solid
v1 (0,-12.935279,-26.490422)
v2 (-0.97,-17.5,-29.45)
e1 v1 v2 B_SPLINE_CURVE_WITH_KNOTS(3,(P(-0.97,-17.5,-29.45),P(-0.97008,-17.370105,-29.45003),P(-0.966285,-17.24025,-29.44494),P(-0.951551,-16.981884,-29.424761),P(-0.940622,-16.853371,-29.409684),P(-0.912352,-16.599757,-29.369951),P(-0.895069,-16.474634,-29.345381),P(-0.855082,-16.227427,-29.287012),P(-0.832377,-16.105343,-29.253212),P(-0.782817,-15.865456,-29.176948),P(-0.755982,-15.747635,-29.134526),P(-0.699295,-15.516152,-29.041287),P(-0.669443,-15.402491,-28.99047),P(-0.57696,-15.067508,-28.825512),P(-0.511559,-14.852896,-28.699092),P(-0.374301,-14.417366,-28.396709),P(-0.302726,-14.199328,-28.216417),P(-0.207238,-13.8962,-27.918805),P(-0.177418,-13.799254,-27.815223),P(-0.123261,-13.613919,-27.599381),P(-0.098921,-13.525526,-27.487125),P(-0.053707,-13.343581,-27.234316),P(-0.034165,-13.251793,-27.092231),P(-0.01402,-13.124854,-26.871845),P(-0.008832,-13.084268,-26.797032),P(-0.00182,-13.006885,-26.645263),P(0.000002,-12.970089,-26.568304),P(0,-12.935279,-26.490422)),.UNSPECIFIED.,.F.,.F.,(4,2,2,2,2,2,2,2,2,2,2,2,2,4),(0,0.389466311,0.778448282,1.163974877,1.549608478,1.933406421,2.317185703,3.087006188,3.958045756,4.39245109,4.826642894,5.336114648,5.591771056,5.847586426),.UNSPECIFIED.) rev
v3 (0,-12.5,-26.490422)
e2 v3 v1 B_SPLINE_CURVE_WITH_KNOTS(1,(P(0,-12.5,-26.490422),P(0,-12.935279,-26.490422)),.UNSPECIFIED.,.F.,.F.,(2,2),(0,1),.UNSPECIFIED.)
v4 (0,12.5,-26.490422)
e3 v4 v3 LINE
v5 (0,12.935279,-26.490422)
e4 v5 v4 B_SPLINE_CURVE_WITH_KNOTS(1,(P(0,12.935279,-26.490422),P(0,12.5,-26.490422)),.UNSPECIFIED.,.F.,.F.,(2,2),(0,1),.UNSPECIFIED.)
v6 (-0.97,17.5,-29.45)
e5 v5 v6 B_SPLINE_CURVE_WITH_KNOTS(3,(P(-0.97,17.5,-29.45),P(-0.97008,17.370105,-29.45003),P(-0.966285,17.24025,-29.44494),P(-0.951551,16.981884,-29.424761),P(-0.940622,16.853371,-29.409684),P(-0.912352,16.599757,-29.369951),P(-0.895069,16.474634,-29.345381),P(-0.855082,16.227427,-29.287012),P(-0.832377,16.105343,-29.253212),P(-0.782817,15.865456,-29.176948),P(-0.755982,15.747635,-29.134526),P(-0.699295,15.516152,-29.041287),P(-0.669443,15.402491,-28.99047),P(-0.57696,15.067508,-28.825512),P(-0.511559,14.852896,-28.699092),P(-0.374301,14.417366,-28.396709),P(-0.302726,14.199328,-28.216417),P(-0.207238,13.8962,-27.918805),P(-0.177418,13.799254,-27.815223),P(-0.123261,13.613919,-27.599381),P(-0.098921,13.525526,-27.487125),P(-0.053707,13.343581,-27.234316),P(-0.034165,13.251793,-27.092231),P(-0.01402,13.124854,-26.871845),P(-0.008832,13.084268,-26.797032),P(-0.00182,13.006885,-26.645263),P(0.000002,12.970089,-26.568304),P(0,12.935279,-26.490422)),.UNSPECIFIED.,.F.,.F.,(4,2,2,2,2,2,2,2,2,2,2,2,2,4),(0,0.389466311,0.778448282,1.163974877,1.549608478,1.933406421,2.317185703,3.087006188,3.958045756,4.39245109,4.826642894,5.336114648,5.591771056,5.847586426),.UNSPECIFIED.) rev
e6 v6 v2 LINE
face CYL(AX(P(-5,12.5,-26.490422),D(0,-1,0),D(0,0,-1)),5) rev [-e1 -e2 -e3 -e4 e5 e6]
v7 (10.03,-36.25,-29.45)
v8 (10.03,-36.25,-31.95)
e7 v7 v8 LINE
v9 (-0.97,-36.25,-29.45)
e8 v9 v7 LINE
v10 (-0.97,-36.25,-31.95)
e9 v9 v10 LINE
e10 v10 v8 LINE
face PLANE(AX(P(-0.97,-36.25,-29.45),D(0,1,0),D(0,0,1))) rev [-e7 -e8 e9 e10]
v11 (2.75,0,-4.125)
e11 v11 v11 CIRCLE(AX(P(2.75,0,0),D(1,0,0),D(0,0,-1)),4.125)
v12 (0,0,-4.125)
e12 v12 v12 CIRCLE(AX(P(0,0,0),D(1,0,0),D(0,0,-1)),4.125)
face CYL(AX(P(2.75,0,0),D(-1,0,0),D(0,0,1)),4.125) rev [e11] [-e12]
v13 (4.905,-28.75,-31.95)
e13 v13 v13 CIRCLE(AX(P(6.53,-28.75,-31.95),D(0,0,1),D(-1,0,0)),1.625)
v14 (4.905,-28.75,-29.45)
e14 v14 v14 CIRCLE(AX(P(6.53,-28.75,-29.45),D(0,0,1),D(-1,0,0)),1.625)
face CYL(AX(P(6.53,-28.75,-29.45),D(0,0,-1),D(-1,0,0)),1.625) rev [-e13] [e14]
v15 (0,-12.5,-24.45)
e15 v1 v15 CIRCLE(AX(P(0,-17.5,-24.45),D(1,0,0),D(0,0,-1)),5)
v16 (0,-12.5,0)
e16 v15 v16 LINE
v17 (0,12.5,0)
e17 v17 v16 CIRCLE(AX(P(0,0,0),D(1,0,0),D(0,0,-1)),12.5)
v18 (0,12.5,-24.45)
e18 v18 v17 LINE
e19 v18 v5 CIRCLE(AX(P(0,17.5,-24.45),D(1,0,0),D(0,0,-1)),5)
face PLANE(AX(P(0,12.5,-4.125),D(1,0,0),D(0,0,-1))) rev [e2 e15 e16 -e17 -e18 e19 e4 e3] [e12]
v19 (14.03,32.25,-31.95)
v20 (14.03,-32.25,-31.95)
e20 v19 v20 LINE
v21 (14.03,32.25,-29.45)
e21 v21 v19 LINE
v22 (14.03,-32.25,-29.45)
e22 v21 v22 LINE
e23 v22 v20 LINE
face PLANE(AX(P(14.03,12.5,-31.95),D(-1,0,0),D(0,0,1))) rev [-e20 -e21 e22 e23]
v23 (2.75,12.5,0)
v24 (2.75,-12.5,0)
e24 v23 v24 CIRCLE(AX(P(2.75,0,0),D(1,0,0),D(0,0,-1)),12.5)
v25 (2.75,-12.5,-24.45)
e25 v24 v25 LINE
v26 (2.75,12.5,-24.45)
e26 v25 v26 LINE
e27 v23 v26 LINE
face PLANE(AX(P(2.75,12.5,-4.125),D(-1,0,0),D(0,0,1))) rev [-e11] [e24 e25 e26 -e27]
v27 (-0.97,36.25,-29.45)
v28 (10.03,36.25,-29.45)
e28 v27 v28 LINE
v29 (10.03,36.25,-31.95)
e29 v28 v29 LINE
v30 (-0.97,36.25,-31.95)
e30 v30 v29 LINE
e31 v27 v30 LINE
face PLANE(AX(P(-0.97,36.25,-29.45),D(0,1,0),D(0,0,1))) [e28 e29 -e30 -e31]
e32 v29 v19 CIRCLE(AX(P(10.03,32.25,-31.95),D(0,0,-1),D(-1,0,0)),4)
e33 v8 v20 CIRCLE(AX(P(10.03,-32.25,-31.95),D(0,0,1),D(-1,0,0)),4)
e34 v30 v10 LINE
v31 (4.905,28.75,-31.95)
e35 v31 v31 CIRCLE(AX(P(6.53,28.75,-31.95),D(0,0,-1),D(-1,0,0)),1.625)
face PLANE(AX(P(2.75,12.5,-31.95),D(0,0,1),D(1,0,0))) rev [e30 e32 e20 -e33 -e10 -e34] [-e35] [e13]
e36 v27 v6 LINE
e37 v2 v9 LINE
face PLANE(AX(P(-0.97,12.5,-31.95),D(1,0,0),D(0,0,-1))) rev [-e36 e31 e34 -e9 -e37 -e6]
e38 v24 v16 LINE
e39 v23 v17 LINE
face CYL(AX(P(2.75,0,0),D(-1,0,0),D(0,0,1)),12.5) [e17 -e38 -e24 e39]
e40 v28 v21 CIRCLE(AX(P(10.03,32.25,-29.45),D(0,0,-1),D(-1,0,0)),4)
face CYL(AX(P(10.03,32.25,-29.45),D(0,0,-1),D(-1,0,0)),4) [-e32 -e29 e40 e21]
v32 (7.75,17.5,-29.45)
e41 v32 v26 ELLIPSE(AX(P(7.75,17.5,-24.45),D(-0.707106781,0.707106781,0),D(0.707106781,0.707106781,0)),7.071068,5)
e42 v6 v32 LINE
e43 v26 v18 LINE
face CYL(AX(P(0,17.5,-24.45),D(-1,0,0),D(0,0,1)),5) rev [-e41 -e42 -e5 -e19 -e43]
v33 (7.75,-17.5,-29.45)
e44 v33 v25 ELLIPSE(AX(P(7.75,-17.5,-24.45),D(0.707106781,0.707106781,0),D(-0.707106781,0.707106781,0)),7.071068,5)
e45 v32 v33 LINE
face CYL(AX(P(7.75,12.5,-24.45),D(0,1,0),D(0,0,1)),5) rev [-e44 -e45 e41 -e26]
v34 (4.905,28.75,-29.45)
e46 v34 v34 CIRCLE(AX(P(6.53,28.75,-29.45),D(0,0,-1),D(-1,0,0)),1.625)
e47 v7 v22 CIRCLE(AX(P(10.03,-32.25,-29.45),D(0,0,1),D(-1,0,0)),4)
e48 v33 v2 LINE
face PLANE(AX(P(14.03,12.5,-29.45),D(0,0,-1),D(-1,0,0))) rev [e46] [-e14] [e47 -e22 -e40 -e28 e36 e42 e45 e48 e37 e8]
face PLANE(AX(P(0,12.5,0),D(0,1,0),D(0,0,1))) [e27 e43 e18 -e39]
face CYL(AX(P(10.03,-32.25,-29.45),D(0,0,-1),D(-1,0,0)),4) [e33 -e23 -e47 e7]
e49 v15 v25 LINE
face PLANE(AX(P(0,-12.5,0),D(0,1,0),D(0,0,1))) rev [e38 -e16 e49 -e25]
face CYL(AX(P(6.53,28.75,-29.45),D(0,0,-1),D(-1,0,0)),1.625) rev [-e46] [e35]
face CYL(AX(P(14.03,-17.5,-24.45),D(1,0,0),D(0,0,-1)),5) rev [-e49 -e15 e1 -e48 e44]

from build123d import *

# Parameters (mm, degrees)
SKETCH1_R               = 4.125
BOSS_EXTRUDE1_DEPTH     = 2.75
BOSS_EXTRUDE4_DEPTH     = 2.5
CUT_EXTRUDE2_REACH      = 80.314
SKETCH7_W               = 7
SKETCH7_H               = 16.5
SKETCH7_W_2             = 16
SKETCH7_H_2             = 8
CUT_EXTRUDE3_REACH      = 82.041
SKETCH9_W               = 2.75
SKETCH9_H               = 22.388822383
SKETCH8_W               = 2.75
SKETCH8_H               = 27.825
BOSS_EXTRUDE5_DEPTH     = 12.5
FILLET2_R               = 1
FILLET3_R               = 4
CUT_EXTRUDE4_DEPTH      = 74.103052287
CUT_EXTRUDE4_DEPTH_BACK = 74.103052287
SKETCH10_W              = 78.235731334
SKETCH10_H              = 6.290045588
SKETCH11_W              = 15
SKETCH11_H              = 2.5
BOSS_EXTRUDE6_DEPTH     = 12.5
BOSS_EXTRUDE7_DEPTH     = 2.5
SKETCH14_R              = 1.625
CUT_EXTRUDE5_DEPTH      = 2.5
FILLET4_R               = 5


with BuildPart() as part:
    # Sketch1 → Boss-Extrude1 (new body)
    with BuildSketch(Plane(origin=(0, 0, 0), x_dir=(0, 0, -1), z_dir=(1, 0, 0))):
        with BuildLine():
            Line((0, 12.5), (34.45, 12.5))
            Line((34.45, 12.5), (34.45, -12.5))
            Line((34.45, -12.5), (0, -12.5))
            ThreePointArc((0, -12.5), (-12.5, 0), (0, 12.5))
        make_face()
        Circle(SKETCH1_R, mode=Mode.SUBTRACT)
    extrude(amount=BOSS_EXTRUDE1_DEPTH)

    # Sketch6 → Boss-Extrude4 (add)
    with BuildSketch(Plane(origin=(0, 0, -34.45), x_dir=(-1, 0, 0), z_dir=(0, 0, -1))):
        Polygon((-8.812505246, 36.25), (53.321583376, 36.25), (53.321583376, -36.25), (6.25, -36.25), (-19.178416624, -36.25), (-19.178416624, 36.25), align=None)
    extrude(amount=-BOSS_EXTRUDE4_DEPTH)

    # Sketch7 → Cut-Extrude2 (cut, up to next)
    with BuildSketch(Plane.XY.offset(-31.95), mode=Mode.PRIVATE) as cut_extrude2_sk1:
        with Locations((-1.711858899, -11.632438111)):
            Rectangle(SKETCH7_W, SKETCH7_H)
    cut_extrude2_tool1 = extrude(cut_extrude2_sk1.sketch, amount=-CUT_EXTRUDE2_REACH, mode=Mode.PRIVATE) & part.part
    # Sketch7 → Cut-Extrude2 (cut, up to next)
    with BuildSketch(Plane.XY.offset(-31.95), mode=Mode.PRIVATE) as cut_extrude2_sk2:
        with Locations((-16.5, 0)):
            Rectangle(SKETCH7_W_2, SKETCH7_H_2)
    cut_extrude2_tool2 = extrude(cut_extrude2_sk2.sketch, amount=-CUT_EXTRUDE2_REACH, mode=Mode.PRIVATE) & part.part
    add(cut_extrude2_tool1.solids().sort_by_distance((-1.711859, -11.632438, -31.95))[0], mode=Mode.SUBTRACT)
    add(cut_extrude2_tool2.solids().sort_by_distance((-16.5, 0, -31.95))[0], mode=Mode.SUBTRACT)

    # Sketch9 → Cut-Extrude3 (cut, up to next)
    with BuildSketch(Plane.XZ.offset(12.5), mode=Mode.PRIVATE) as cut_extrude3_sk1:
        with Locations((1.375, -20.755588809)):
            Rectangle(SKETCH9_W, SKETCH9_H)
    cut_extrude3_tool1 = extrude(cut_extrude3_sk1.sketch, amount=-CUT_EXTRUDE3_REACH, mode=Mode.PRIVATE) & part.part
    add(cut_extrude3_tool1.solids().sort_by_distance((1.375, -12.5, -20.755589))[0], mode=Mode.SUBTRACT)


with BuildPart() as cut_extrude3_piece_1:
    # of the separate pieces the step leaves, piece 1, a body of its own (cut_extrude3_pieces)
    add(part.part.solids().sort_by_distance((-53.321583376, 36.25, -31.95))[0])



with BuildPart() as cut_extrude3_piece_2:
    # of the separate pieces the step leaves, piece 2, a body of its own (cut_extrude3_pieces)
    add(part.part.solids().sort_by_distance((0, 12.5, 0))[0])


with BuildPart() as cut_extrude3_piece_1_1:
    add(cut_extrude3_piece_1.part)

    add(cut_extrude3_piece_2.part)  # Boss-Extrude5 merges Cut-Extrude3 piece 2
    # Sketch8 → Boss-Extrude5 (add, symmetric)
    with BuildSketch(Plane(origin=(0, 0, 0), x_dir=(1, 0, 0), z_dir=(0, 1, 0))):
        with Locations((1.375, 18.0375)):
            Rectangle(SKETCH8_W, SKETCH8_H)
    extrude(amount=BOSS_EXTRUDE5_DEPTH, both=True)

    # Fillet2
    fillet2_edges = [cut_extrude3_piece_1_1.edges().sort_by_distance(p)[0] for p in [
        (-8.5, 4, -33.2),
        (-8.5, -4, -33.2),
        (-24.5, -4, -33.2),
        (-24.5, 4, -33.2),
        (-5.211858899, -19.882438111, -33.2),
        (-5.211858899, -3.382438111, -33.2),
        (1.788141101, -3.382438111, -33.2),
        (1.788141101, -19.882438111, -33.2),
    ]]
    fillet(fillet2_edges, radius=FILLET2_R)

    # Fillet3
    fillet3_edges = [cut_extrude3_piece_1_1.edges().sort_by_distance(p)[0] for p in [
        (19.178416624, 36.25, -33.2),
        (-53.321583376, 36.25, -33.2),
        (-53.321583376, -36.25, -33.2),
        (19.178416624, -36.25, -33.2),
    ]]
    fillet(fillet3_edges, radius=FILLET3_R)

    # Sketch10 → Cut-Extrude4 (cut, two sides: drawn at the far end of the back side and taken through both)
    with BuildSketch(Plane(origin=(0, 0, 0), x_dir=(1, 0, 0), z_dir=(0, 1, 0)).offset(-CUT_EXTRUDE4_DEPTH_BACK)):
        with Locations((-17.391929865, 35.095022794)):
            Rectangle(SKETCH10_W, SKETCH10_H)
    extrude(amount=CUT_EXTRUDE4_DEPTH + CUT_EXTRUDE4_DEPTH_BACK, mode=Mode.SUBTRACT)

    # Sketch11 → Boss-Extrude6 (add, symmetric)
    with BuildSketch(Plane(origin=(0, 0, 0), x_dir=(1, 0, 0), z_dir=(0, 1, 0))):
        with Locations((6.53, 30.7)):
            Rectangle(SKETCH11_W, SKETCH11_H)
    boss_extrude6 = extrude(amount=BOSS_EXTRUDE6_DEPTH, both=True)

    # Sketch13 → Boss-Extrude7 (add)
    with BuildSketch(Plane(origin=(0, 0, -31.95), x_dir=(-1, 0, 0), z_dir=(0, 0, -1))):
        with BuildLine():
            Line((-14.03, 12.5), (0.97, 12.5))
            Line((0.97, 12.5), (0.97, 36.25))
            Line((0.97, 36.25), (-10.03, 36.25))
            ThreePointArc((-10.03, 36.25), (-12.858427125, 35.078427125), (-14.03, 32.25))
            Line((-14.03, 32.25), (-14.03, 12.5))
        make_face()
    boss_extrude7 = extrude(amount=-BOSS_EXTRUDE7_DEPTH)

    # Mirror1: Boss-Extrude6, Boss-Extrude7 across plane
    add(boss_extrude6.mirror(Plane.ZX))
    add(boss_extrude7.mirror(Plane.ZX))

    # Sketch14 → Cut-Extrude5 (cut)
    with BuildSketch(Plane(origin=(0, 0, -31.95), x_dir=(-1, 0, 0), z_dir=(0, 0, -1))):
        with Locations((-6.53, 28.75)):
            Circle(SKETCH14_R)
    cut_extrude5 = extrude(amount=-CUT_EXTRUDE5_DEPTH, mode=Mode.SUBTRACT)

    # Mirror2: Cut-Extrude5 across plane
    add(cut_extrude5.mirror(Plane.ZX), mode=Mode.SUBTRACT)

    # Fillet4
    # the kernel refuses this fillet: 5 mm, written as the material it adds along each edge
    with BuildSketch(Plane(origin=(2.75, -12.5, -29.45), x_dir=(1, 0, 0), z_dir=(0, 1, 0))) as fillet4_piece_1:
        with BuildLine():
            CenterArc((FILLET4_R, -FILLET4_R), FILLET4_R, 90, 90)
            Line((0, -FILLET4_R), (-FILLET4_R * 0.02, -FILLET4_R))
            Line((-FILLET4_R * 0.02, -FILLET4_R), (-FILLET4_R * 0.02, FILLET4_R * 0.02))
            Line((-FILLET4_R * 0.02, FILLET4_R * 0.02), (FILLET4_R, FILLET4_R * 0.02))
            Line((FILLET4_R, FILLET4_R * 0.02), (FILLET4_R, 0))
        make_face()
    extrude(amount=25)
    with BuildSketch(Plane(origin=(0, -12.5, -29.45), x_dir=(-1, 0, 0), z_dir=(0, 1, 0))) as fillet4_piece_2:
        with BuildLine():
            CenterArc((5, 2.959577673), FILLET4_R, 180, 36.293058493)
            Line((0, 2.959577673), (-0.1, 2.959577673))
            Line((-0.1, 2.959577673), (-0.1, 0))
            Line((-0.1, 0), (0, -0.1))
            ThreePointArc((0, -0.1), (0.485, -0.1), (0.8894, -0.059191553))
            Line((0.8894, -0.059191553), (0.97, 0))
        make_face()
    extrude(amount=25)
    with BuildSketch(Plane(origin=(2.75, 12.5, -29.45), x_dir=(0, 0, 1), z_dir=(-1, 0, 0)), Plane(origin=(2.75, -12.5, -29.45), x_dir=(0, -1, 0), z_dir=(-1, 0, 0))) as fillet4_piece_3:
        with BuildLine():
            CenterArc((FILLET4_R, FILLET4_R), FILLET4_R, 180, 90)
            Line((0, FILLET4_R), (-FILLET4_R * 0.02, FILLET4_R))
            Line((-FILLET4_R * 0.02, FILLET4_R), (-FILLET4_R * 0.02, -FILLET4_R * 0.02))
            Line((-FILLET4_R * 0.02, -FILLET4_R * 0.02), (FILLET4_R, -FILLET4_R * 0.02))
            Line((FILLET4_R, -FILLET4_R * 0.02), (FILLET4_R, 0))
        make_face()
    extrude(amount=2.75)
    with BuildSketch(Plane(origin=(2.75, -25, -29.45), x_dir=(1, 0, 0), z_dir=(0, 1, 0))) as fillet4_piece_4a_section:
        with BuildLine():
            CenterArc((FILLET4_R, -FILLET4_R), FILLET4_R, 90, 90)
            Line((0, -FILLET4_R), (-FILLET4_R * 0.02, -FILLET4_R))
            Line((-FILLET4_R * 0.02, -FILLET4_R), (-FILLET4_R * 0.02, FILLET4_R * 0.02))
            Line((-FILLET4_R * 0.02, FILLET4_R * 0.02), (FILLET4_R, FILLET4_R * 0.02))
            Line((FILLET4_R, FILLET4_R * 0.02), (FILLET4_R, 0))
        make_face()
    fillet4_piece_4a = extrude(amount=37.5, mode=Mode.PRIVATE)
    fillet4_piece_4a = split(fillet4_piece_4a, bisect_by=Plane(origin=(3.881975571, -12.5, -28.318024429), z_dir=(0, -1, 0)), keep=Keep.TOP, mode=Mode.PRIVATE)
    with BuildSketch(Plane(origin=(15.25, -12.5, -29.45), x_dir=(0, -1, 0), z_dir=(-1, 0, 0))) as fillet4_piece_4b_section:
        with BuildLine():
            CenterArc((FILLET4_R, FILLET4_R), FILLET4_R, 180, 90)
            Line((0, FILLET4_R), (-FILLET4_R * 0.02, FILLET4_R))
            Line((-FILLET4_R * 0.02, FILLET4_R), (-FILLET4_R * 0.02, -FILLET4_R * 0.02))
            Line((-FILLET4_R * 0.02, -FILLET4_R * 0.02), (FILLET4_R, -FILLET4_R * 0.02))
            Line((FILLET4_R, -FILLET4_R * 0.02), (FILLET4_R, 0))
        make_face()
    fillet4_piece_4b = extrude(amount=15.25, mode=Mode.PRIVATE)
    fillet4_piece_4b = split(fillet4_piece_4b, bisect_by=Plane(origin=(14.03, -13.631975571, -28.318024429), z_dir=(-1, 0, 0)), keep=Keep.TOP, mode=Mode.PRIVATE)
    fillet4_piece_4b = split(fillet4_piece_4b, bisect_by=Plane(origin=(2.75, -13.631975571, -28.318024429), z_dir=(1, 0, 0)), keep=Keep.TOP, mode=Mode.PRIVATE)
    fillet4_piece_4 = fillet4_piece_4a & fillet4_piece_4b
    add(fillet4_piece_4)
    with BuildSketch(Plane(origin=(15.25, 12.5, -29.45), x_dir=(0, 0, 1), z_dir=(-1, 0, 0))) as fillet4_piece_5a_section:
        with BuildLine():
            CenterArc((FILLET4_R, FILLET4_R), FILLET4_R, 180, 90)
            Line((0, FILLET4_R), (-FILLET4_R * 0.02, FILLET4_R))
            Line((-FILLET4_R * 0.02, FILLET4_R), (-FILLET4_R * 0.02, -FILLET4_R * 0.02))
            Line((-FILLET4_R * 0.02, -FILLET4_R * 0.02), (FILLET4_R, -FILLET4_R * 0.02))
            Line((FILLET4_R, -FILLET4_R * 0.02), (FILLET4_R, 0))
        make_face()
    fillet4_piece_5a = extrude(amount=15.25, mode=Mode.PRIVATE)
    fillet4_piece_5a = split(fillet4_piece_5a, bisect_by=Plane(origin=(2.75, 13.631975571, -28.318024429), z_dir=(1, 0, 0)), keep=Keep.TOP, mode=Mode.PRIVATE)
    fillet4_piece_5a = split(fillet4_piece_5a, bisect_by=Plane(origin=(14.03, 13.631975571, -28.318024429), z_dir=(-1, 0, 0)), keep=Keep.TOP, mode=Mode.PRIVATE)
    with BuildSketch(Plane(origin=(2.75, -12.5, -29.45), x_dir=(1, 0, 0), z_dir=(0, 1, 0))) as fillet4_piece_5b_section:
        with BuildLine():
            CenterArc((FILLET4_R, -FILLET4_R), FILLET4_R, 90, 90)
            Line((0, -FILLET4_R), (-FILLET4_R * 0.02, -FILLET4_R))
            Line((-FILLET4_R * 0.02, -FILLET4_R), (-FILLET4_R * 0.02, FILLET4_R * 0.02))
            Line((-FILLET4_R * 0.02, FILLET4_R * 0.02), (FILLET4_R, FILLET4_R * 0.02))
            Line((FILLET4_R, FILLET4_R * 0.02), (FILLET4_R, 0))
        make_face()
    fillet4_piece_5b = extrude(amount=37.5, mode=Mode.PRIVATE)
    fillet4_piece_5b = split(fillet4_piece_5b, bisect_by=Plane(origin=(3.881975571, 12.5, -28.318024429), z_dir=(0, 1, 0)), keep=Keep.TOP, mode=Mode.PRIVATE)
    fillet4_piece_5 = fillet4_piece_5a & fillet4_piece_5b
    add(fillet4_piece_5)
    with BuildSketch(Plane(origin=(2.75, -12.5, -29.45), x_dir=(0, -1, 0), z_dir=(-1, 0, 0))) as fillet4_piece_6a_section:
        with BuildLine():
            CenterArc((FILLET4_R, FILLET4_R), FILLET4_R, 180, 90)
            Line((0, FILLET4_R), (-FILLET4_R * 0.02, FILLET4_R))
            Line((-FILLET4_R * 0.02, FILLET4_R), (-FILLET4_R * 0.02, -FILLET4_R * 0.02))
            Line((-FILLET4_R * 0.02, -FILLET4_R * 0.02), (FILLET4_R, -FILLET4_R * 0.02))
            Line((FILLET4_R, -FILLET4_R * 0.02), (FILLET4_R, 0))
        make_face()
    fillet4_piece_6a = extrude(amount=15.25, mode=Mode.PRIVATE)
    fillet4_piece_6a = split(fillet4_piece_6a, bisect_by=Plane(origin=(-0.97, -13.631975571, -28.318024429), z_dir=(1, 0, 0)), keep=Keep.TOP, mode=Mode.PRIVATE)
    fillet4_piece_6a = split(fillet4_piece_6a, bisect_by=Plane(origin=(0, -13.631975571, -28.318024429), z_dir=(-1, 0, 0)), keep=Keep.TOP, mode=Mode.PRIVATE)
    with BuildSketch(Plane(origin=(0, -19.898944181, -29.45), x_dir=(-1, 0, 0), z_dir=(0, 1, 0))) as fillet4_piece_6b_section:
        with BuildLine():
            CenterArc((5, 2.959577673), FILLET4_R, 180, 36.293058493)
            Line((0, 2.959577673), (-0.1, 2.959577673))
            Line((-0.1, 2.959577673), (-0.1, 0))
            Line((-0.1, 0), (0, -0.1))
            ThreePointArc((0, -0.1), (0.485, -0.1), (0.8894, -0.059191553))
            Line((0.8894, -0.059191553), (0.97, 0))
        make_face()
    fillet4_piece_6b = extrude(amount=32.398944181, mode=Mode.PRIVATE)
    fillet4_piece_6b = split(fillet4_piece_6b, bisect_by=Plane(origin=(-0.217435867, -12.5, -28.607978011), z_dir=(0, -1, 0)), keep=Keep.TOP, mode=Mode.PRIVATE)
    fillet4_piece_6 = fillet4_piece_6a & fillet4_piece_6b
    add(fillet4_piece_6)
    with BuildSketch(Plane(origin=(2.75, 12.5, -29.45), x_dir=(0, 0, 1), z_dir=(-1, 0, 0))) as fillet4_piece_7a_section:
        with BuildLine():
            CenterArc((FILLET4_R, FILLET4_R), FILLET4_R, 180, 90)
            Line((0, FILLET4_R), (-FILLET4_R * 0.02, FILLET4_R))
            Line((-FILLET4_R * 0.02, FILLET4_R), (-FILLET4_R * 0.02, -FILLET4_R * 0.02))
            Line((-FILLET4_R * 0.02, -FILLET4_R * 0.02), (FILLET4_R, -FILLET4_R * 0.02))
            Line((FILLET4_R, -FILLET4_R * 0.02), (FILLET4_R, 0))
        make_face()
    fillet4_piece_7a = extrude(amount=15.25, mode=Mode.PRIVATE)
    fillet4_piece_7a = split(fillet4_piece_7a, bisect_by=Plane(origin=(0, 13.631975571, -28.318024429), z_dir=(-1, 0, 0)), keep=Keep.TOP, mode=Mode.PRIVATE)
    fillet4_piece_7a = split(fillet4_piece_7a, bisect_by=Plane(origin=(-0.97, 13.631975571, -28.318024429), z_dir=(1, 0, 0)), keep=Keep.TOP, mode=Mode.PRIVATE)
    with BuildSketch(Plane(origin=(0, -12.5, -29.45), x_dir=(-1, 0, 0), z_dir=(0, 1, 0))) as fillet4_piece_7b_section:
        with BuildLine():
            CenterArc((5, 2.959577673), FILLET4_R, 180, 36.293058493)
            Line((0, 2.959577673), (-0.1, 2.959577673))
            Line((-0.1, 2.959577673), (-0.1, 0))
            Line((-0.1, 0), (0, -0.1))
            ThreePointArc((0, -0.1), (0.485, -0.1), (0.8894, -0.059191553))
            Line((0.8894, -0.059191553), (0.97, 0))
        make_face()
    fillet4_piece_7b = extrude(amount=32.398944181, mode=Mode.PRIVATE)
    fillet4_piece_7b = split(fillet4_piece_7b, bisect_by=Plane(origin=(-0.217435867, 12.5, -28.607978011), z_dir=(0, 1, 0)), keep=Keep.TOP, mode=Mode.PRIVATE)
    fillet4_piece_7 = fillet4_piece_7a & fillet4_piece_7b
    add(fillet4_piece_7)


solid = cut_extrude3_piece_1_1.part
